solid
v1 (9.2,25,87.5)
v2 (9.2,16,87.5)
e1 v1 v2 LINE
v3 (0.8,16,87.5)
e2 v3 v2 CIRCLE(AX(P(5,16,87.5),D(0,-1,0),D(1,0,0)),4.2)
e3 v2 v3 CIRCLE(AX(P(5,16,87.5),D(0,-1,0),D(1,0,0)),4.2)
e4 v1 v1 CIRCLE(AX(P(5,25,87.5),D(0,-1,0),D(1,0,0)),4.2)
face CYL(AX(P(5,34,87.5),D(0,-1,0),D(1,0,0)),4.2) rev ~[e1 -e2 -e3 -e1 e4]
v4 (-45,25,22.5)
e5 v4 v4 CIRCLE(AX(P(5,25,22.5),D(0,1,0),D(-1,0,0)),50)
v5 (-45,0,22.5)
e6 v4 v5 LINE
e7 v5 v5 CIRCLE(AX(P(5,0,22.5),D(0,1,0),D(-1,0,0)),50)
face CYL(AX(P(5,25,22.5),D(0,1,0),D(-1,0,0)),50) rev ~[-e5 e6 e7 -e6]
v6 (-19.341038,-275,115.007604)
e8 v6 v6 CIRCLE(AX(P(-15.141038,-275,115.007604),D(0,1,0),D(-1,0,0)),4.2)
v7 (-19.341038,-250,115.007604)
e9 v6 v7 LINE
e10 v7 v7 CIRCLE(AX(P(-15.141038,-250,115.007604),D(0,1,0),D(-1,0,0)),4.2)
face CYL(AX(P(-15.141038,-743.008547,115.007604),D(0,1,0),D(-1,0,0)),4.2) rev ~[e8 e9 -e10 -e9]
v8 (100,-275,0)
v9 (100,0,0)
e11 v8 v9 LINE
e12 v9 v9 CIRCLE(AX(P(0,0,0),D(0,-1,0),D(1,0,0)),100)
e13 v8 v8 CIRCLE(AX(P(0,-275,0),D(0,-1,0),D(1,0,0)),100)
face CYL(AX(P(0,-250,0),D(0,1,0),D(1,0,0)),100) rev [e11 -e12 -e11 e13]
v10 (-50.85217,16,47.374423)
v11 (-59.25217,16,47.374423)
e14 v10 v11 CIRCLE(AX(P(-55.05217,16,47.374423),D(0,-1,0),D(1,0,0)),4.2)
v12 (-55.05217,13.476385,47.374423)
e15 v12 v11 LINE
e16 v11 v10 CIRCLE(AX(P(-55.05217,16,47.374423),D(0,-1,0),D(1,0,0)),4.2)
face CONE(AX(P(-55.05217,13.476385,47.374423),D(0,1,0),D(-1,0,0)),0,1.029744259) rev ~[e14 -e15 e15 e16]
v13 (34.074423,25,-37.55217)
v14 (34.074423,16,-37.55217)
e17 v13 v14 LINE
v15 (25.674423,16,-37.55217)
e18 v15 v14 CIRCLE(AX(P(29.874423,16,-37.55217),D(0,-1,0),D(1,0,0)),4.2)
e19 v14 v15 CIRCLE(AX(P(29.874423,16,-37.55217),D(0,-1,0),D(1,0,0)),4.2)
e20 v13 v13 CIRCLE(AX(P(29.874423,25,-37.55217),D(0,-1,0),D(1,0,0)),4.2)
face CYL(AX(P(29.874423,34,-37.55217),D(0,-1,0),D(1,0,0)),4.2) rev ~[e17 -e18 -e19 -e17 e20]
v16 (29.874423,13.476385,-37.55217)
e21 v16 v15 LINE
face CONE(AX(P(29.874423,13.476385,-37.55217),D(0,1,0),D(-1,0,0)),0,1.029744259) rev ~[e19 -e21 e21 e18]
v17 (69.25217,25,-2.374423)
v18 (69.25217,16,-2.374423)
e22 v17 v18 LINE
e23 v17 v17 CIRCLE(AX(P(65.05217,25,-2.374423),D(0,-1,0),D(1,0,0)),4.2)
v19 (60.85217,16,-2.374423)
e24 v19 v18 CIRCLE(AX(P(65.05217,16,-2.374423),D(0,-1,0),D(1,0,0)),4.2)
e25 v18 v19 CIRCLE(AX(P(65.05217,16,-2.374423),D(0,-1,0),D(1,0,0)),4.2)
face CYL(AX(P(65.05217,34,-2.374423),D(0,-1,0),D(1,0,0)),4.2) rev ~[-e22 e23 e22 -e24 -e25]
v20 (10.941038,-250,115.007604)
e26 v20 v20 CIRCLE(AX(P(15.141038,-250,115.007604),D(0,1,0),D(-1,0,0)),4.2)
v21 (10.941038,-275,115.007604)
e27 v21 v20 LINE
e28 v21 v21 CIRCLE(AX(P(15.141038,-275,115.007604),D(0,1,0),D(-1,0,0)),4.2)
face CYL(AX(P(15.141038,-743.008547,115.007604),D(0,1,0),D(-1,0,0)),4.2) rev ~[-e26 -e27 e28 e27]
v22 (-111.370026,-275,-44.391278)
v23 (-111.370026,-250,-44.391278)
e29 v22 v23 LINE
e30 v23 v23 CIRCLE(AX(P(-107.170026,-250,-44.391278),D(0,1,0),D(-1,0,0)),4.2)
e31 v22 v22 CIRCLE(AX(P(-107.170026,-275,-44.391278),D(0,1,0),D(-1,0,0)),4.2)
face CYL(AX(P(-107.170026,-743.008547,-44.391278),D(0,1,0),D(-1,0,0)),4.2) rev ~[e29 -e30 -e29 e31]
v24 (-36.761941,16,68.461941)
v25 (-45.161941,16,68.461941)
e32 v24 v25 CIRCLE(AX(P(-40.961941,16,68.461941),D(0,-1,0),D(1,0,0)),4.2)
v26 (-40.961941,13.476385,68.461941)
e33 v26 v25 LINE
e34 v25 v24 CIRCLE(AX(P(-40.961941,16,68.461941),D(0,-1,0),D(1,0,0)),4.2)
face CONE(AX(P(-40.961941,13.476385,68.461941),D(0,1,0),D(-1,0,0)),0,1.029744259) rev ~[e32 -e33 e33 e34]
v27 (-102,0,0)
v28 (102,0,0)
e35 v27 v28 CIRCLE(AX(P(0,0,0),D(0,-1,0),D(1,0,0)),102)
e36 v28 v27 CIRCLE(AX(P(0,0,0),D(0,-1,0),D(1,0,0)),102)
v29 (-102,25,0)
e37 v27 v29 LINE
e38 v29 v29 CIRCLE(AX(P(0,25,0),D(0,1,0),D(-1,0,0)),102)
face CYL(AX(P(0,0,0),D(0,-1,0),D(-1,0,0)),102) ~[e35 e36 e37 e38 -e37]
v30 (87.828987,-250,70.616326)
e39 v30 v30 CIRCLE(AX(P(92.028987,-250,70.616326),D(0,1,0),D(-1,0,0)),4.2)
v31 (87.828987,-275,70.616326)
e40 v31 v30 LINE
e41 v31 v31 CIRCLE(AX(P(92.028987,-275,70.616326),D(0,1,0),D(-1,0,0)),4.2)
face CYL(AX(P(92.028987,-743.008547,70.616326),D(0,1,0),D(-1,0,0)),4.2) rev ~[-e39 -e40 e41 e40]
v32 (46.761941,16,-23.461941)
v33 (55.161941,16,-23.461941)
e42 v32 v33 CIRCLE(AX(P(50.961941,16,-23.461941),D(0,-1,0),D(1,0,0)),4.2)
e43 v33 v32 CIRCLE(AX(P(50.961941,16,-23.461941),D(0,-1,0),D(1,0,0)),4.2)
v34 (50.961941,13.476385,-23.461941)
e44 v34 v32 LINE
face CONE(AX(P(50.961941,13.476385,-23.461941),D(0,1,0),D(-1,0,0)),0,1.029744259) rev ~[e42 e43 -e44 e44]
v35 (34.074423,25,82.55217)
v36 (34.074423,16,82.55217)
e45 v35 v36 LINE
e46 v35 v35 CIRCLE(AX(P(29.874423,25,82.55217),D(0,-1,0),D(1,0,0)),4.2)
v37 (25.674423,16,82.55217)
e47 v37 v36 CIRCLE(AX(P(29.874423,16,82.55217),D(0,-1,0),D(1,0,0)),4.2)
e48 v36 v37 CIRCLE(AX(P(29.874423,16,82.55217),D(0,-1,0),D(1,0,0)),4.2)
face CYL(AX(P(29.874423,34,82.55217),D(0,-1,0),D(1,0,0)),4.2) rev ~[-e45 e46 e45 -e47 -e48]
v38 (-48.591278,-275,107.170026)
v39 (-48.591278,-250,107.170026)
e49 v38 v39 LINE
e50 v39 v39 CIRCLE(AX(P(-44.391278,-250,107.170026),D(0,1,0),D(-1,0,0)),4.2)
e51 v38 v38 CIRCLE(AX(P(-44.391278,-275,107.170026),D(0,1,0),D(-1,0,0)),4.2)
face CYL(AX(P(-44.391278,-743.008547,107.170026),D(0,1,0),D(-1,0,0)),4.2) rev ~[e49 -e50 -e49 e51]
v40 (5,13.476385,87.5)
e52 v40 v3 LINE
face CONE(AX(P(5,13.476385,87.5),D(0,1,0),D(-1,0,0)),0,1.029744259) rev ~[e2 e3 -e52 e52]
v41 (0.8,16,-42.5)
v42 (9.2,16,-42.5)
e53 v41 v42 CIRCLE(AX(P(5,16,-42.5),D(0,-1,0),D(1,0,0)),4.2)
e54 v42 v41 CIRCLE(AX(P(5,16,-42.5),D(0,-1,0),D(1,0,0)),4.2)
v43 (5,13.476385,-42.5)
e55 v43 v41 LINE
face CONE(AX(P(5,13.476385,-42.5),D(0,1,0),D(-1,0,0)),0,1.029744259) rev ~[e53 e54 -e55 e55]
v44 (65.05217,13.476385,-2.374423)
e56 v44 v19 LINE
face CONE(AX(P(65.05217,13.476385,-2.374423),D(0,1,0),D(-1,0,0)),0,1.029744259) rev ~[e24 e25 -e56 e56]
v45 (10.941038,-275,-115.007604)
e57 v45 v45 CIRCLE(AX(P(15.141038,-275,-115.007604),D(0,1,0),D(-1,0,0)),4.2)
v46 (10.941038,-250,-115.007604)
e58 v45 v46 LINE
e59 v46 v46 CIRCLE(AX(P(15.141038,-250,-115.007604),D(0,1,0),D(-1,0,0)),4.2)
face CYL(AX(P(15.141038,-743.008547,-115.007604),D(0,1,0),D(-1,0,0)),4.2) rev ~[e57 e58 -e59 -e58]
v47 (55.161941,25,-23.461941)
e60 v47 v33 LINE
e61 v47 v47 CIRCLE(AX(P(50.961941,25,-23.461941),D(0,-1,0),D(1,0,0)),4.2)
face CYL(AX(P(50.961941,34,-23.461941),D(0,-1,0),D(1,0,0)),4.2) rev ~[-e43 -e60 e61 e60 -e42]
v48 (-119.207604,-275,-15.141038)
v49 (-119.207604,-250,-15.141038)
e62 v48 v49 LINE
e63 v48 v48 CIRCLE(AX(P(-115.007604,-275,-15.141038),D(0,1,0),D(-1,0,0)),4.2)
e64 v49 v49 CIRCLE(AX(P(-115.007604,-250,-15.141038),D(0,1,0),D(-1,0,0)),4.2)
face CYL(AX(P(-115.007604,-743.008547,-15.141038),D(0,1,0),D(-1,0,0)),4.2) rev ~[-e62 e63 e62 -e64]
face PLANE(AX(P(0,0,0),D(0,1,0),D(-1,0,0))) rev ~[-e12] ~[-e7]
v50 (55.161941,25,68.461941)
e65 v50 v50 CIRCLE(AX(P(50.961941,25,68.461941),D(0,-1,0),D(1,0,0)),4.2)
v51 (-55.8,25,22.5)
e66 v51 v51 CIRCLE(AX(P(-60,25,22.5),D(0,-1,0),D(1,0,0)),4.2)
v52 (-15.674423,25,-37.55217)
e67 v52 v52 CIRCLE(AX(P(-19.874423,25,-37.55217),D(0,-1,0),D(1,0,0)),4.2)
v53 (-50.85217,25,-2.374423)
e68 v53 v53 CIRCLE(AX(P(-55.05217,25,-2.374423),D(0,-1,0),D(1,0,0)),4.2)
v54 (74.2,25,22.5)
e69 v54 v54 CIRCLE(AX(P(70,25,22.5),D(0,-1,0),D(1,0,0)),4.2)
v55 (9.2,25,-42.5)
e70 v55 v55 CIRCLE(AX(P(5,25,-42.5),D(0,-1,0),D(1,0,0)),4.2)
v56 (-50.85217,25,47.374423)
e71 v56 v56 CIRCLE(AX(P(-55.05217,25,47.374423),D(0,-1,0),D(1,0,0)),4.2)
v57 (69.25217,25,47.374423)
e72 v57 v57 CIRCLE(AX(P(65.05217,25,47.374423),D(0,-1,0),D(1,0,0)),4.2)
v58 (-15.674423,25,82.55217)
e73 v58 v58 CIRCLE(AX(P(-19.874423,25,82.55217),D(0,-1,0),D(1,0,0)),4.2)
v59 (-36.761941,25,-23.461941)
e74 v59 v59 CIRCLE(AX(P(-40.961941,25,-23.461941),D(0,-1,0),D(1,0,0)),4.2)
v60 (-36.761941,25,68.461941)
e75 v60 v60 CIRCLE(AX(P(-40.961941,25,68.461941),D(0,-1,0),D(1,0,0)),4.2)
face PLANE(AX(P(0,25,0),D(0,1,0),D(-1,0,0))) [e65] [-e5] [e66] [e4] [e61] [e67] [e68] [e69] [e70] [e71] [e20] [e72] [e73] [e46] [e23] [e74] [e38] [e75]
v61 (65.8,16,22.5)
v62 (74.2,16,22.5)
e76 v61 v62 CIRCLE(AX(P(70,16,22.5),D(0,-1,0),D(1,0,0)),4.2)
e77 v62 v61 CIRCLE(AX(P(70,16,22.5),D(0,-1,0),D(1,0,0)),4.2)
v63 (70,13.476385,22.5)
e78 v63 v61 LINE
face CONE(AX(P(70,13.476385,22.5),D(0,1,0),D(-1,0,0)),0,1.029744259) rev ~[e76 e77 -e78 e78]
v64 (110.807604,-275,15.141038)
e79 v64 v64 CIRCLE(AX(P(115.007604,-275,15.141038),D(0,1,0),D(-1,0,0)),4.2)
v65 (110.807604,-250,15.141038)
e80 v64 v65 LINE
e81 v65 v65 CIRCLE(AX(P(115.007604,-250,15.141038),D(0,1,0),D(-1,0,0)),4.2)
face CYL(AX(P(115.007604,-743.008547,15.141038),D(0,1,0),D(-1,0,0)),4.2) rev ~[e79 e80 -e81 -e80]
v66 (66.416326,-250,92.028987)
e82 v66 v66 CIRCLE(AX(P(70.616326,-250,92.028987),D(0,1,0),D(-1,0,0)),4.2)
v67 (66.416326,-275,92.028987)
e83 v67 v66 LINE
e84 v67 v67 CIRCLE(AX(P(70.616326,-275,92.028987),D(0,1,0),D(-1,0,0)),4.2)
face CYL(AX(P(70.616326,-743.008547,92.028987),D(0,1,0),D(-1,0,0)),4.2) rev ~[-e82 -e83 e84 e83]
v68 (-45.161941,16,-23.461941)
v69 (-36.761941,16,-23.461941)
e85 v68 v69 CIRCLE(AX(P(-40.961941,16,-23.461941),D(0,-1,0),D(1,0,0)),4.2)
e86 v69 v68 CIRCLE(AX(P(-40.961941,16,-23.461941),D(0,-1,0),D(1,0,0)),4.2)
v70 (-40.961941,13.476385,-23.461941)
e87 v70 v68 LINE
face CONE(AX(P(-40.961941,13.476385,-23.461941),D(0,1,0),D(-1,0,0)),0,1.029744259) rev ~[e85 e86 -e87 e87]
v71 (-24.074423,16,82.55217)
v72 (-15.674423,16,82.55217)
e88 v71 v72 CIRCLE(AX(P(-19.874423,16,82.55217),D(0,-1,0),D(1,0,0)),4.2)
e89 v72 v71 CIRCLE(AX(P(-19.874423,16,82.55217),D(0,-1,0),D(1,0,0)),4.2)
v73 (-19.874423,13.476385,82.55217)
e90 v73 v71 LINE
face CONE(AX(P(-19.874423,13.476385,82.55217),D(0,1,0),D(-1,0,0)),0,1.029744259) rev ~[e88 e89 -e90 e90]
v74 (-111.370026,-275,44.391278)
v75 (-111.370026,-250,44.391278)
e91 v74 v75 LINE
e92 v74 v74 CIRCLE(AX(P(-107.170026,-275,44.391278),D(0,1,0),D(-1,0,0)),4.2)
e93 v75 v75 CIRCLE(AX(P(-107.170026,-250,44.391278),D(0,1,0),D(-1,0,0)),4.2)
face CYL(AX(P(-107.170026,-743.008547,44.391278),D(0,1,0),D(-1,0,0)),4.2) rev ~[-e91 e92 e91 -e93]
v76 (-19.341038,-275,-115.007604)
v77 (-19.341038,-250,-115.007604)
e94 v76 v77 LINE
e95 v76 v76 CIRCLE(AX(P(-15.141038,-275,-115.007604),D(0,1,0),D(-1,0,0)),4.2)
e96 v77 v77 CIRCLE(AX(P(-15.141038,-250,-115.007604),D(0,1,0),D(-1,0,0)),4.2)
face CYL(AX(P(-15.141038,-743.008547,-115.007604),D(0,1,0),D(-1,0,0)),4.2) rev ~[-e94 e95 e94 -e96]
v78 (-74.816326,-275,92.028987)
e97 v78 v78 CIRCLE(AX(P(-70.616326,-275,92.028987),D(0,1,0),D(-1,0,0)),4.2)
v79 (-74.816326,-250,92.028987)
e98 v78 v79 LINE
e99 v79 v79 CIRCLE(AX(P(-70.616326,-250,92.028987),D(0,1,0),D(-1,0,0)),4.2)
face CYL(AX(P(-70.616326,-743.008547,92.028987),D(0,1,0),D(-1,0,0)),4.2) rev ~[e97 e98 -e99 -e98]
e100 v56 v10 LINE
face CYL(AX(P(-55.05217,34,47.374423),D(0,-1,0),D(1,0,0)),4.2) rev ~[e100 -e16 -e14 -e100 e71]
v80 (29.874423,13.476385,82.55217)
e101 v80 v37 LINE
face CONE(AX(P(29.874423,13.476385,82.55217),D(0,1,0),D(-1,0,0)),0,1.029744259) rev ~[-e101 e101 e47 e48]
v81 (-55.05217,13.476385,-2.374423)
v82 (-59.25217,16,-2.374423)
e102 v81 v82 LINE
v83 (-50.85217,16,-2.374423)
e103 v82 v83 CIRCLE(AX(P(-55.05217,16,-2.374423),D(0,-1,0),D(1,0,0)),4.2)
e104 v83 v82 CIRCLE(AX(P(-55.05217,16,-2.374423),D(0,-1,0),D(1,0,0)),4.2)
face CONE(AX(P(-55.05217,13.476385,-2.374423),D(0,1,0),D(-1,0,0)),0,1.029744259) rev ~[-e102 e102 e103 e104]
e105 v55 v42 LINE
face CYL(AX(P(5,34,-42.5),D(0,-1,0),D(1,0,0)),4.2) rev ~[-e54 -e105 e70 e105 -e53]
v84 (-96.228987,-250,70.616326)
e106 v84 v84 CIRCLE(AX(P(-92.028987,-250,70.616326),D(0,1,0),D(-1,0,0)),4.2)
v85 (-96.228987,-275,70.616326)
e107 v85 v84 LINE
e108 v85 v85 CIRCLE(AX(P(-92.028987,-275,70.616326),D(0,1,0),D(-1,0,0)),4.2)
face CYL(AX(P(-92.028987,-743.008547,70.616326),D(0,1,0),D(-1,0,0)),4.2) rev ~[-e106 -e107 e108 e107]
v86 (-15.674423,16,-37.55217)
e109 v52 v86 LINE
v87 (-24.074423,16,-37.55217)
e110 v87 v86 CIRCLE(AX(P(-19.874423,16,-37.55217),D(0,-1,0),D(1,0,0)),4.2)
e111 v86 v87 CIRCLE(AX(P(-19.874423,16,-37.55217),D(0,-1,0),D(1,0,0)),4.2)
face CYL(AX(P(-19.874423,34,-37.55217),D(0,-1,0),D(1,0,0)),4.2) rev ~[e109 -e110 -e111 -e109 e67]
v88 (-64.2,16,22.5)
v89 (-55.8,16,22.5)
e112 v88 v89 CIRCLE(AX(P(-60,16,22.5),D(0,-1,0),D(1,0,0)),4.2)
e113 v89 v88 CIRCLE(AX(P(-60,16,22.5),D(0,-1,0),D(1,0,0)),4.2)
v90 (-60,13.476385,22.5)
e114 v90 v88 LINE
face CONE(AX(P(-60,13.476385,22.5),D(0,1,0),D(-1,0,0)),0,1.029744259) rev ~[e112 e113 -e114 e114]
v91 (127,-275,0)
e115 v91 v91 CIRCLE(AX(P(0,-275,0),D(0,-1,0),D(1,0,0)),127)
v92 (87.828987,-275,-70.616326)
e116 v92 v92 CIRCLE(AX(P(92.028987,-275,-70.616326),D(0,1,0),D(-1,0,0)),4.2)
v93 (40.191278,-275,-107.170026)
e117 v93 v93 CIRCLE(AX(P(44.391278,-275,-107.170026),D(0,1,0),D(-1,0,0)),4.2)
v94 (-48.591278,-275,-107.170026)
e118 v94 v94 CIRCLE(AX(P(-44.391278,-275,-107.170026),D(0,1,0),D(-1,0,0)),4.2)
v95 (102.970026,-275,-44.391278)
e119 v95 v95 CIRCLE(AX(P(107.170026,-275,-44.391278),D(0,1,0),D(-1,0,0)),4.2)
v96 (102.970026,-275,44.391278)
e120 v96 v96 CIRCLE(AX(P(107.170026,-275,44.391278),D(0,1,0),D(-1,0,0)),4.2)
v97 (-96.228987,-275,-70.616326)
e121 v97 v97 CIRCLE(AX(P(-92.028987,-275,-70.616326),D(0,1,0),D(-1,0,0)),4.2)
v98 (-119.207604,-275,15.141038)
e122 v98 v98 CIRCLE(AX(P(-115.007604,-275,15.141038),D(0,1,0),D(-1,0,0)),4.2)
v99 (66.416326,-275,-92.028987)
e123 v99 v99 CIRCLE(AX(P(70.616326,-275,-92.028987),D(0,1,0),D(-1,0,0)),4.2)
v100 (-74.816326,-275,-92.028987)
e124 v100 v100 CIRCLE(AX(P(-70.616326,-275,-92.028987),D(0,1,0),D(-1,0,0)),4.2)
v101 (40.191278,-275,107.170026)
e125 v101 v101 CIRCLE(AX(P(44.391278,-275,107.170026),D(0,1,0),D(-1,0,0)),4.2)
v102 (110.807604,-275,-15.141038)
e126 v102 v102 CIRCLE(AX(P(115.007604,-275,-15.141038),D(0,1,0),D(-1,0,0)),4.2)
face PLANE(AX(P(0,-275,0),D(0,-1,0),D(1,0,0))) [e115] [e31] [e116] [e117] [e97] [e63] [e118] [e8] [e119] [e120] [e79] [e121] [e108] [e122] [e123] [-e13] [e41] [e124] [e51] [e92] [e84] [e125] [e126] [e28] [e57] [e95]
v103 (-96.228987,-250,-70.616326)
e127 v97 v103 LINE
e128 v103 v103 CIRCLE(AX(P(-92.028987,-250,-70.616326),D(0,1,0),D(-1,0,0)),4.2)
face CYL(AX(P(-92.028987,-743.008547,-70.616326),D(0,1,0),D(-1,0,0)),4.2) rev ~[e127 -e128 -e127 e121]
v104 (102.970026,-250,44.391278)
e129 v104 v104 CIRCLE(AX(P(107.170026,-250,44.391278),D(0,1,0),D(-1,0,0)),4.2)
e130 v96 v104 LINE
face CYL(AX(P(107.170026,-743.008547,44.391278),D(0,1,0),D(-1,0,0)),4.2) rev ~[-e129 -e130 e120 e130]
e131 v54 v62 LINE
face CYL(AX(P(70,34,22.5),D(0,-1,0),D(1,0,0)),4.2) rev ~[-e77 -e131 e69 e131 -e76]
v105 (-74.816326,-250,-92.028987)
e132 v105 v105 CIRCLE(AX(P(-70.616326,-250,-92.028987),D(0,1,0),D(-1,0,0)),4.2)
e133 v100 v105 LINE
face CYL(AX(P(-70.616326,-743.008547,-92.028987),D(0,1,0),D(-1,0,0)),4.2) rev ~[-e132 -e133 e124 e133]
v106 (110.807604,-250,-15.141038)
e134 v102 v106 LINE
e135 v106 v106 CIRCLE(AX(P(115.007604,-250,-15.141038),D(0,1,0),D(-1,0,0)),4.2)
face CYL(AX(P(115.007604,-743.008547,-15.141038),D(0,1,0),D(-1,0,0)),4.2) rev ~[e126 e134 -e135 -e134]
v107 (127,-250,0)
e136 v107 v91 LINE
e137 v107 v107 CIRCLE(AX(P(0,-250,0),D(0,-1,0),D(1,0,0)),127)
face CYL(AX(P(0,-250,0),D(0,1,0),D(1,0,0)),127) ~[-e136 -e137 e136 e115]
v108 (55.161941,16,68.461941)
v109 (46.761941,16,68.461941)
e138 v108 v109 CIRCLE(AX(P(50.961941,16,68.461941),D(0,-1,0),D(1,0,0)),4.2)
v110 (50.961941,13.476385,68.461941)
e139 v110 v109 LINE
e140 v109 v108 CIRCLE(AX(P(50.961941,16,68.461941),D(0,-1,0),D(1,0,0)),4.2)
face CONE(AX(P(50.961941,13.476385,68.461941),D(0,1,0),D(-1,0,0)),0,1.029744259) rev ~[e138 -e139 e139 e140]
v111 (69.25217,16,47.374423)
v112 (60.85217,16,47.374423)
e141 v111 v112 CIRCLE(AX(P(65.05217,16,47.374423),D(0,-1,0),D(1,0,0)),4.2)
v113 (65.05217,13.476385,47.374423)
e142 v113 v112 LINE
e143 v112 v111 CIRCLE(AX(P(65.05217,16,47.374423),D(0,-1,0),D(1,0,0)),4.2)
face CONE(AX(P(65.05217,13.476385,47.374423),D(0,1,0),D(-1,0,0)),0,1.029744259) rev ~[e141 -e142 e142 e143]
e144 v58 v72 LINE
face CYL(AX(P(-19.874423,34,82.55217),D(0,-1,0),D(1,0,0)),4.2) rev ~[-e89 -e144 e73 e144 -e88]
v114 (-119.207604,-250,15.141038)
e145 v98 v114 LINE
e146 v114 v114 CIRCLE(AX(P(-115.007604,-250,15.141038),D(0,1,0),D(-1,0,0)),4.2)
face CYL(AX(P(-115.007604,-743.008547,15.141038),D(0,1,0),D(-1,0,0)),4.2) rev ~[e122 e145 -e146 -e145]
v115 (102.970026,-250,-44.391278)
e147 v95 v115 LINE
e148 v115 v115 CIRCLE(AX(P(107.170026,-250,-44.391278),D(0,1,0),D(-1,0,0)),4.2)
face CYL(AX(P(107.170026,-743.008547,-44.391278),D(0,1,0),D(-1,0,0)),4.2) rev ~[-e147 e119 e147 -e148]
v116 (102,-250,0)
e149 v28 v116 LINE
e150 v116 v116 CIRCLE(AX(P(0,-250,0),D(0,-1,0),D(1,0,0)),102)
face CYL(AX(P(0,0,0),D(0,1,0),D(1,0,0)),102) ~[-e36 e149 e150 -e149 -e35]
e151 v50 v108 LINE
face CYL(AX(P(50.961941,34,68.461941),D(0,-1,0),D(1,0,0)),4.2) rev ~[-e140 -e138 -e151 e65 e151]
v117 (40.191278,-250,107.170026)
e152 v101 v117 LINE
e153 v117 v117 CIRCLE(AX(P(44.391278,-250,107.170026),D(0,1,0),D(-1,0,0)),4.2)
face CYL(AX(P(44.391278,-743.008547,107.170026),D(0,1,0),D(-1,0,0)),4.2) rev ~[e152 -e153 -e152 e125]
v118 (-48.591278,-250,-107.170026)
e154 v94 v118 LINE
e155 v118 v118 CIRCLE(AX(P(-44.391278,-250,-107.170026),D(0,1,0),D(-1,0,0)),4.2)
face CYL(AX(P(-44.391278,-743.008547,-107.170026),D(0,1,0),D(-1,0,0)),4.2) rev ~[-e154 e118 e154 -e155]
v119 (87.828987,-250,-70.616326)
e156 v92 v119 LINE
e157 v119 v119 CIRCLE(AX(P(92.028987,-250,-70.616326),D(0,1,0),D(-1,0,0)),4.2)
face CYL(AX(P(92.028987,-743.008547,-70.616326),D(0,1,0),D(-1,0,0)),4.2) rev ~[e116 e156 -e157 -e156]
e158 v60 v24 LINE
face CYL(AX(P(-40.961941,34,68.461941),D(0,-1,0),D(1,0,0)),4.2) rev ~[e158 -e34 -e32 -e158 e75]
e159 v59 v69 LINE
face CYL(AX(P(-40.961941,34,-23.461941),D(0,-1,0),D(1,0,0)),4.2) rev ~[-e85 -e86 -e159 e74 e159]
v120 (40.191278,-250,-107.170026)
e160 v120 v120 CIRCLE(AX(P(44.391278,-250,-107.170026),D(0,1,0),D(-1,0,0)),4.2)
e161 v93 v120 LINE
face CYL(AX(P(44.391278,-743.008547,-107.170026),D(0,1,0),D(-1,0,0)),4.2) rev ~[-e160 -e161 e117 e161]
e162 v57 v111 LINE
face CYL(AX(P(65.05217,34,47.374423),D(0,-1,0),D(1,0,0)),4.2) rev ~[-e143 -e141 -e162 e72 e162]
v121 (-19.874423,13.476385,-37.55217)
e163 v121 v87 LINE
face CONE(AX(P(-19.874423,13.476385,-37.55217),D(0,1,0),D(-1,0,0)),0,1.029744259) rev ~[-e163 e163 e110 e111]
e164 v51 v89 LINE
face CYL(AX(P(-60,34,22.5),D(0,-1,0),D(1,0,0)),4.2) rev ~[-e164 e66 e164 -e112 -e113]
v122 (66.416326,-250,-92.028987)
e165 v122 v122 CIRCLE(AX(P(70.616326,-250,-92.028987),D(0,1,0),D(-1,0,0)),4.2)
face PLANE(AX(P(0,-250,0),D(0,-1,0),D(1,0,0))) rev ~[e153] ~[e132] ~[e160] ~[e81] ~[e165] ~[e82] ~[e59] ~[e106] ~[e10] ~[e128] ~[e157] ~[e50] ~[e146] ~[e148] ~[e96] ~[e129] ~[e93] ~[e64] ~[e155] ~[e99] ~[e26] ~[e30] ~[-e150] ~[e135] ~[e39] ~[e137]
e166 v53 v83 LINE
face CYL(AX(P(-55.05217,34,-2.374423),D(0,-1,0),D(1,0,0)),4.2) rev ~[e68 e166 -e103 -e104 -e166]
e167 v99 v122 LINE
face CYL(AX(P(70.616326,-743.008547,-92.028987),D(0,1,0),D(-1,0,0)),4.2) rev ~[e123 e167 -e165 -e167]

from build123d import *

# Parameters (mm, degrees)
F0_R      = 102
F0_R_2    = 100
F1_DEPTH  = 250
F2_R      = 127
F2_R_2    = 102
F2_R_3    = 100
F3_DEPTH  = 25
F4_R      = 102
F4_R_2    = 100
F5_DEPTH  = 25
F7_D      = 8.4
F8_R      = 50
F9_DEPTH  = 300.001
F10_D     = 8.4
F10_DEPTH = 9
F10_TIP   = 2.5236145999


with BuildPart() as f1:
    # F0 (on Front) → F1 (new body)
    with BuildSketch(Plane.XZ):
        Circle(F0_R)
        Circle(F0_R_2, mode=Mode.SUBTRACT)
    extrude(amount=F1_DEPTH)

    # F2 (on face) → F3 (join)
    with BuildSketch(Plane.XZ.offset(250)):
        Circle(F2_R)
        Circle(F2_R_2, mode=Mode.SUBTRACT)
        Circle(F2_R_2)
        Circle(F2_R_3, mode=Mode.SUBTRACT)
    extrude(amount=F3_DEPTH)

    # F4 (on face) → F5 (join)
    with BuildSketch(Plane(origin=(0, 0, 0), x_dir=(-1, 0, 0), z_dir=(0, 1, 0))):
        Circle(F4_R)
        Circle(F4_R_2, mode=Mode.SUBTRACT)
        Circle(F4_R_2)
    extrude(amount=F5_DEPTH)

    # F7 (through all)
    with Locations(Plane.XZ.offset(275)):
        with Locations((15.1410382975, 115.0076039194), (44.3912781544, 107.1700257713), (70.616325765, 92.0289874738), (92.0289874738, 70.616325765), (107.1700257713, 44.3912781544), (115.0076039194, 15.1410382975), (115.0076039194, -15.1410382975), (107.1700257713, -44.3912781544), (92.0289874738, -70.616325765), (70.616325765, -92.0289874738), (44.3912781544, -107.1700257713), (15.1410382975, -115.0076039194), (-15.1410382975, -115.0076039194), (-44.3912781544, -107.1700257713), (-70.616325765, -92.0289874738), (-92.0289874738, -70.616325765), (-107.1700257713, -44.3912781544), (-115.0076039194, -15.1410382975), (-115.0076039194, 15.1410382975), (-107.1700257713, 44.3912781544), (-92.0289874738, 70.616325765), (-70.616325765, 92.0289874738), (-44.3912781544, 107.1700257713), (-15.1410382975, 115.0076039194)):
            Hole(F7_D / 2)

    # F8 (on face) → F9 (cut, through all)
    with BuildSketch(Plane(origin=(0, 25, 0), x_dir=(-1, 0, 0), z_dir=(0, 1, 0))):
        with Locations((-5, 22.5)):
            Circle(F8_R)
    extrude(amount=-F9_DEPTH, mode=Mode.SUBTRACT)

    # F10
    with Locations(Plane(origin=(0, 25, 0), x_dir=(-1, 0, 0), z_dir=(0, 1, 0))):
        with Locations((-5, 87.5), (-29.8744231037, -37.5521696132), (-50.9619407771, -23.4619407771), (-65.0521696132, -2.3744231037), (-70, 22.5), (-65.0521696132, 47.3744231037), (-50.9619407771, 68.4619407771), (-29.8744231037, 82.5521696132), (19.8744231037, 82.5521696132), (40.9619407771, 68.4619407771), (55.0521696132, 47.3744231037), (60, 22.5), (55.0521696132, -2.3744231037), (40.9619407771, -23.4619407771), (19.8744231037, -37.5521696132), (-5, -42.5)):
            Hole(F10_D / 2, depth=F10_DEPTH)
            with Locations((0, 0, -(F10_DEPTH + F10_TIP / 2))):  # 118° drill point
                Cone(0, F10_D / 2, F10_TIP, mode=Mode.SUBTRACT)


solid = f1.part
